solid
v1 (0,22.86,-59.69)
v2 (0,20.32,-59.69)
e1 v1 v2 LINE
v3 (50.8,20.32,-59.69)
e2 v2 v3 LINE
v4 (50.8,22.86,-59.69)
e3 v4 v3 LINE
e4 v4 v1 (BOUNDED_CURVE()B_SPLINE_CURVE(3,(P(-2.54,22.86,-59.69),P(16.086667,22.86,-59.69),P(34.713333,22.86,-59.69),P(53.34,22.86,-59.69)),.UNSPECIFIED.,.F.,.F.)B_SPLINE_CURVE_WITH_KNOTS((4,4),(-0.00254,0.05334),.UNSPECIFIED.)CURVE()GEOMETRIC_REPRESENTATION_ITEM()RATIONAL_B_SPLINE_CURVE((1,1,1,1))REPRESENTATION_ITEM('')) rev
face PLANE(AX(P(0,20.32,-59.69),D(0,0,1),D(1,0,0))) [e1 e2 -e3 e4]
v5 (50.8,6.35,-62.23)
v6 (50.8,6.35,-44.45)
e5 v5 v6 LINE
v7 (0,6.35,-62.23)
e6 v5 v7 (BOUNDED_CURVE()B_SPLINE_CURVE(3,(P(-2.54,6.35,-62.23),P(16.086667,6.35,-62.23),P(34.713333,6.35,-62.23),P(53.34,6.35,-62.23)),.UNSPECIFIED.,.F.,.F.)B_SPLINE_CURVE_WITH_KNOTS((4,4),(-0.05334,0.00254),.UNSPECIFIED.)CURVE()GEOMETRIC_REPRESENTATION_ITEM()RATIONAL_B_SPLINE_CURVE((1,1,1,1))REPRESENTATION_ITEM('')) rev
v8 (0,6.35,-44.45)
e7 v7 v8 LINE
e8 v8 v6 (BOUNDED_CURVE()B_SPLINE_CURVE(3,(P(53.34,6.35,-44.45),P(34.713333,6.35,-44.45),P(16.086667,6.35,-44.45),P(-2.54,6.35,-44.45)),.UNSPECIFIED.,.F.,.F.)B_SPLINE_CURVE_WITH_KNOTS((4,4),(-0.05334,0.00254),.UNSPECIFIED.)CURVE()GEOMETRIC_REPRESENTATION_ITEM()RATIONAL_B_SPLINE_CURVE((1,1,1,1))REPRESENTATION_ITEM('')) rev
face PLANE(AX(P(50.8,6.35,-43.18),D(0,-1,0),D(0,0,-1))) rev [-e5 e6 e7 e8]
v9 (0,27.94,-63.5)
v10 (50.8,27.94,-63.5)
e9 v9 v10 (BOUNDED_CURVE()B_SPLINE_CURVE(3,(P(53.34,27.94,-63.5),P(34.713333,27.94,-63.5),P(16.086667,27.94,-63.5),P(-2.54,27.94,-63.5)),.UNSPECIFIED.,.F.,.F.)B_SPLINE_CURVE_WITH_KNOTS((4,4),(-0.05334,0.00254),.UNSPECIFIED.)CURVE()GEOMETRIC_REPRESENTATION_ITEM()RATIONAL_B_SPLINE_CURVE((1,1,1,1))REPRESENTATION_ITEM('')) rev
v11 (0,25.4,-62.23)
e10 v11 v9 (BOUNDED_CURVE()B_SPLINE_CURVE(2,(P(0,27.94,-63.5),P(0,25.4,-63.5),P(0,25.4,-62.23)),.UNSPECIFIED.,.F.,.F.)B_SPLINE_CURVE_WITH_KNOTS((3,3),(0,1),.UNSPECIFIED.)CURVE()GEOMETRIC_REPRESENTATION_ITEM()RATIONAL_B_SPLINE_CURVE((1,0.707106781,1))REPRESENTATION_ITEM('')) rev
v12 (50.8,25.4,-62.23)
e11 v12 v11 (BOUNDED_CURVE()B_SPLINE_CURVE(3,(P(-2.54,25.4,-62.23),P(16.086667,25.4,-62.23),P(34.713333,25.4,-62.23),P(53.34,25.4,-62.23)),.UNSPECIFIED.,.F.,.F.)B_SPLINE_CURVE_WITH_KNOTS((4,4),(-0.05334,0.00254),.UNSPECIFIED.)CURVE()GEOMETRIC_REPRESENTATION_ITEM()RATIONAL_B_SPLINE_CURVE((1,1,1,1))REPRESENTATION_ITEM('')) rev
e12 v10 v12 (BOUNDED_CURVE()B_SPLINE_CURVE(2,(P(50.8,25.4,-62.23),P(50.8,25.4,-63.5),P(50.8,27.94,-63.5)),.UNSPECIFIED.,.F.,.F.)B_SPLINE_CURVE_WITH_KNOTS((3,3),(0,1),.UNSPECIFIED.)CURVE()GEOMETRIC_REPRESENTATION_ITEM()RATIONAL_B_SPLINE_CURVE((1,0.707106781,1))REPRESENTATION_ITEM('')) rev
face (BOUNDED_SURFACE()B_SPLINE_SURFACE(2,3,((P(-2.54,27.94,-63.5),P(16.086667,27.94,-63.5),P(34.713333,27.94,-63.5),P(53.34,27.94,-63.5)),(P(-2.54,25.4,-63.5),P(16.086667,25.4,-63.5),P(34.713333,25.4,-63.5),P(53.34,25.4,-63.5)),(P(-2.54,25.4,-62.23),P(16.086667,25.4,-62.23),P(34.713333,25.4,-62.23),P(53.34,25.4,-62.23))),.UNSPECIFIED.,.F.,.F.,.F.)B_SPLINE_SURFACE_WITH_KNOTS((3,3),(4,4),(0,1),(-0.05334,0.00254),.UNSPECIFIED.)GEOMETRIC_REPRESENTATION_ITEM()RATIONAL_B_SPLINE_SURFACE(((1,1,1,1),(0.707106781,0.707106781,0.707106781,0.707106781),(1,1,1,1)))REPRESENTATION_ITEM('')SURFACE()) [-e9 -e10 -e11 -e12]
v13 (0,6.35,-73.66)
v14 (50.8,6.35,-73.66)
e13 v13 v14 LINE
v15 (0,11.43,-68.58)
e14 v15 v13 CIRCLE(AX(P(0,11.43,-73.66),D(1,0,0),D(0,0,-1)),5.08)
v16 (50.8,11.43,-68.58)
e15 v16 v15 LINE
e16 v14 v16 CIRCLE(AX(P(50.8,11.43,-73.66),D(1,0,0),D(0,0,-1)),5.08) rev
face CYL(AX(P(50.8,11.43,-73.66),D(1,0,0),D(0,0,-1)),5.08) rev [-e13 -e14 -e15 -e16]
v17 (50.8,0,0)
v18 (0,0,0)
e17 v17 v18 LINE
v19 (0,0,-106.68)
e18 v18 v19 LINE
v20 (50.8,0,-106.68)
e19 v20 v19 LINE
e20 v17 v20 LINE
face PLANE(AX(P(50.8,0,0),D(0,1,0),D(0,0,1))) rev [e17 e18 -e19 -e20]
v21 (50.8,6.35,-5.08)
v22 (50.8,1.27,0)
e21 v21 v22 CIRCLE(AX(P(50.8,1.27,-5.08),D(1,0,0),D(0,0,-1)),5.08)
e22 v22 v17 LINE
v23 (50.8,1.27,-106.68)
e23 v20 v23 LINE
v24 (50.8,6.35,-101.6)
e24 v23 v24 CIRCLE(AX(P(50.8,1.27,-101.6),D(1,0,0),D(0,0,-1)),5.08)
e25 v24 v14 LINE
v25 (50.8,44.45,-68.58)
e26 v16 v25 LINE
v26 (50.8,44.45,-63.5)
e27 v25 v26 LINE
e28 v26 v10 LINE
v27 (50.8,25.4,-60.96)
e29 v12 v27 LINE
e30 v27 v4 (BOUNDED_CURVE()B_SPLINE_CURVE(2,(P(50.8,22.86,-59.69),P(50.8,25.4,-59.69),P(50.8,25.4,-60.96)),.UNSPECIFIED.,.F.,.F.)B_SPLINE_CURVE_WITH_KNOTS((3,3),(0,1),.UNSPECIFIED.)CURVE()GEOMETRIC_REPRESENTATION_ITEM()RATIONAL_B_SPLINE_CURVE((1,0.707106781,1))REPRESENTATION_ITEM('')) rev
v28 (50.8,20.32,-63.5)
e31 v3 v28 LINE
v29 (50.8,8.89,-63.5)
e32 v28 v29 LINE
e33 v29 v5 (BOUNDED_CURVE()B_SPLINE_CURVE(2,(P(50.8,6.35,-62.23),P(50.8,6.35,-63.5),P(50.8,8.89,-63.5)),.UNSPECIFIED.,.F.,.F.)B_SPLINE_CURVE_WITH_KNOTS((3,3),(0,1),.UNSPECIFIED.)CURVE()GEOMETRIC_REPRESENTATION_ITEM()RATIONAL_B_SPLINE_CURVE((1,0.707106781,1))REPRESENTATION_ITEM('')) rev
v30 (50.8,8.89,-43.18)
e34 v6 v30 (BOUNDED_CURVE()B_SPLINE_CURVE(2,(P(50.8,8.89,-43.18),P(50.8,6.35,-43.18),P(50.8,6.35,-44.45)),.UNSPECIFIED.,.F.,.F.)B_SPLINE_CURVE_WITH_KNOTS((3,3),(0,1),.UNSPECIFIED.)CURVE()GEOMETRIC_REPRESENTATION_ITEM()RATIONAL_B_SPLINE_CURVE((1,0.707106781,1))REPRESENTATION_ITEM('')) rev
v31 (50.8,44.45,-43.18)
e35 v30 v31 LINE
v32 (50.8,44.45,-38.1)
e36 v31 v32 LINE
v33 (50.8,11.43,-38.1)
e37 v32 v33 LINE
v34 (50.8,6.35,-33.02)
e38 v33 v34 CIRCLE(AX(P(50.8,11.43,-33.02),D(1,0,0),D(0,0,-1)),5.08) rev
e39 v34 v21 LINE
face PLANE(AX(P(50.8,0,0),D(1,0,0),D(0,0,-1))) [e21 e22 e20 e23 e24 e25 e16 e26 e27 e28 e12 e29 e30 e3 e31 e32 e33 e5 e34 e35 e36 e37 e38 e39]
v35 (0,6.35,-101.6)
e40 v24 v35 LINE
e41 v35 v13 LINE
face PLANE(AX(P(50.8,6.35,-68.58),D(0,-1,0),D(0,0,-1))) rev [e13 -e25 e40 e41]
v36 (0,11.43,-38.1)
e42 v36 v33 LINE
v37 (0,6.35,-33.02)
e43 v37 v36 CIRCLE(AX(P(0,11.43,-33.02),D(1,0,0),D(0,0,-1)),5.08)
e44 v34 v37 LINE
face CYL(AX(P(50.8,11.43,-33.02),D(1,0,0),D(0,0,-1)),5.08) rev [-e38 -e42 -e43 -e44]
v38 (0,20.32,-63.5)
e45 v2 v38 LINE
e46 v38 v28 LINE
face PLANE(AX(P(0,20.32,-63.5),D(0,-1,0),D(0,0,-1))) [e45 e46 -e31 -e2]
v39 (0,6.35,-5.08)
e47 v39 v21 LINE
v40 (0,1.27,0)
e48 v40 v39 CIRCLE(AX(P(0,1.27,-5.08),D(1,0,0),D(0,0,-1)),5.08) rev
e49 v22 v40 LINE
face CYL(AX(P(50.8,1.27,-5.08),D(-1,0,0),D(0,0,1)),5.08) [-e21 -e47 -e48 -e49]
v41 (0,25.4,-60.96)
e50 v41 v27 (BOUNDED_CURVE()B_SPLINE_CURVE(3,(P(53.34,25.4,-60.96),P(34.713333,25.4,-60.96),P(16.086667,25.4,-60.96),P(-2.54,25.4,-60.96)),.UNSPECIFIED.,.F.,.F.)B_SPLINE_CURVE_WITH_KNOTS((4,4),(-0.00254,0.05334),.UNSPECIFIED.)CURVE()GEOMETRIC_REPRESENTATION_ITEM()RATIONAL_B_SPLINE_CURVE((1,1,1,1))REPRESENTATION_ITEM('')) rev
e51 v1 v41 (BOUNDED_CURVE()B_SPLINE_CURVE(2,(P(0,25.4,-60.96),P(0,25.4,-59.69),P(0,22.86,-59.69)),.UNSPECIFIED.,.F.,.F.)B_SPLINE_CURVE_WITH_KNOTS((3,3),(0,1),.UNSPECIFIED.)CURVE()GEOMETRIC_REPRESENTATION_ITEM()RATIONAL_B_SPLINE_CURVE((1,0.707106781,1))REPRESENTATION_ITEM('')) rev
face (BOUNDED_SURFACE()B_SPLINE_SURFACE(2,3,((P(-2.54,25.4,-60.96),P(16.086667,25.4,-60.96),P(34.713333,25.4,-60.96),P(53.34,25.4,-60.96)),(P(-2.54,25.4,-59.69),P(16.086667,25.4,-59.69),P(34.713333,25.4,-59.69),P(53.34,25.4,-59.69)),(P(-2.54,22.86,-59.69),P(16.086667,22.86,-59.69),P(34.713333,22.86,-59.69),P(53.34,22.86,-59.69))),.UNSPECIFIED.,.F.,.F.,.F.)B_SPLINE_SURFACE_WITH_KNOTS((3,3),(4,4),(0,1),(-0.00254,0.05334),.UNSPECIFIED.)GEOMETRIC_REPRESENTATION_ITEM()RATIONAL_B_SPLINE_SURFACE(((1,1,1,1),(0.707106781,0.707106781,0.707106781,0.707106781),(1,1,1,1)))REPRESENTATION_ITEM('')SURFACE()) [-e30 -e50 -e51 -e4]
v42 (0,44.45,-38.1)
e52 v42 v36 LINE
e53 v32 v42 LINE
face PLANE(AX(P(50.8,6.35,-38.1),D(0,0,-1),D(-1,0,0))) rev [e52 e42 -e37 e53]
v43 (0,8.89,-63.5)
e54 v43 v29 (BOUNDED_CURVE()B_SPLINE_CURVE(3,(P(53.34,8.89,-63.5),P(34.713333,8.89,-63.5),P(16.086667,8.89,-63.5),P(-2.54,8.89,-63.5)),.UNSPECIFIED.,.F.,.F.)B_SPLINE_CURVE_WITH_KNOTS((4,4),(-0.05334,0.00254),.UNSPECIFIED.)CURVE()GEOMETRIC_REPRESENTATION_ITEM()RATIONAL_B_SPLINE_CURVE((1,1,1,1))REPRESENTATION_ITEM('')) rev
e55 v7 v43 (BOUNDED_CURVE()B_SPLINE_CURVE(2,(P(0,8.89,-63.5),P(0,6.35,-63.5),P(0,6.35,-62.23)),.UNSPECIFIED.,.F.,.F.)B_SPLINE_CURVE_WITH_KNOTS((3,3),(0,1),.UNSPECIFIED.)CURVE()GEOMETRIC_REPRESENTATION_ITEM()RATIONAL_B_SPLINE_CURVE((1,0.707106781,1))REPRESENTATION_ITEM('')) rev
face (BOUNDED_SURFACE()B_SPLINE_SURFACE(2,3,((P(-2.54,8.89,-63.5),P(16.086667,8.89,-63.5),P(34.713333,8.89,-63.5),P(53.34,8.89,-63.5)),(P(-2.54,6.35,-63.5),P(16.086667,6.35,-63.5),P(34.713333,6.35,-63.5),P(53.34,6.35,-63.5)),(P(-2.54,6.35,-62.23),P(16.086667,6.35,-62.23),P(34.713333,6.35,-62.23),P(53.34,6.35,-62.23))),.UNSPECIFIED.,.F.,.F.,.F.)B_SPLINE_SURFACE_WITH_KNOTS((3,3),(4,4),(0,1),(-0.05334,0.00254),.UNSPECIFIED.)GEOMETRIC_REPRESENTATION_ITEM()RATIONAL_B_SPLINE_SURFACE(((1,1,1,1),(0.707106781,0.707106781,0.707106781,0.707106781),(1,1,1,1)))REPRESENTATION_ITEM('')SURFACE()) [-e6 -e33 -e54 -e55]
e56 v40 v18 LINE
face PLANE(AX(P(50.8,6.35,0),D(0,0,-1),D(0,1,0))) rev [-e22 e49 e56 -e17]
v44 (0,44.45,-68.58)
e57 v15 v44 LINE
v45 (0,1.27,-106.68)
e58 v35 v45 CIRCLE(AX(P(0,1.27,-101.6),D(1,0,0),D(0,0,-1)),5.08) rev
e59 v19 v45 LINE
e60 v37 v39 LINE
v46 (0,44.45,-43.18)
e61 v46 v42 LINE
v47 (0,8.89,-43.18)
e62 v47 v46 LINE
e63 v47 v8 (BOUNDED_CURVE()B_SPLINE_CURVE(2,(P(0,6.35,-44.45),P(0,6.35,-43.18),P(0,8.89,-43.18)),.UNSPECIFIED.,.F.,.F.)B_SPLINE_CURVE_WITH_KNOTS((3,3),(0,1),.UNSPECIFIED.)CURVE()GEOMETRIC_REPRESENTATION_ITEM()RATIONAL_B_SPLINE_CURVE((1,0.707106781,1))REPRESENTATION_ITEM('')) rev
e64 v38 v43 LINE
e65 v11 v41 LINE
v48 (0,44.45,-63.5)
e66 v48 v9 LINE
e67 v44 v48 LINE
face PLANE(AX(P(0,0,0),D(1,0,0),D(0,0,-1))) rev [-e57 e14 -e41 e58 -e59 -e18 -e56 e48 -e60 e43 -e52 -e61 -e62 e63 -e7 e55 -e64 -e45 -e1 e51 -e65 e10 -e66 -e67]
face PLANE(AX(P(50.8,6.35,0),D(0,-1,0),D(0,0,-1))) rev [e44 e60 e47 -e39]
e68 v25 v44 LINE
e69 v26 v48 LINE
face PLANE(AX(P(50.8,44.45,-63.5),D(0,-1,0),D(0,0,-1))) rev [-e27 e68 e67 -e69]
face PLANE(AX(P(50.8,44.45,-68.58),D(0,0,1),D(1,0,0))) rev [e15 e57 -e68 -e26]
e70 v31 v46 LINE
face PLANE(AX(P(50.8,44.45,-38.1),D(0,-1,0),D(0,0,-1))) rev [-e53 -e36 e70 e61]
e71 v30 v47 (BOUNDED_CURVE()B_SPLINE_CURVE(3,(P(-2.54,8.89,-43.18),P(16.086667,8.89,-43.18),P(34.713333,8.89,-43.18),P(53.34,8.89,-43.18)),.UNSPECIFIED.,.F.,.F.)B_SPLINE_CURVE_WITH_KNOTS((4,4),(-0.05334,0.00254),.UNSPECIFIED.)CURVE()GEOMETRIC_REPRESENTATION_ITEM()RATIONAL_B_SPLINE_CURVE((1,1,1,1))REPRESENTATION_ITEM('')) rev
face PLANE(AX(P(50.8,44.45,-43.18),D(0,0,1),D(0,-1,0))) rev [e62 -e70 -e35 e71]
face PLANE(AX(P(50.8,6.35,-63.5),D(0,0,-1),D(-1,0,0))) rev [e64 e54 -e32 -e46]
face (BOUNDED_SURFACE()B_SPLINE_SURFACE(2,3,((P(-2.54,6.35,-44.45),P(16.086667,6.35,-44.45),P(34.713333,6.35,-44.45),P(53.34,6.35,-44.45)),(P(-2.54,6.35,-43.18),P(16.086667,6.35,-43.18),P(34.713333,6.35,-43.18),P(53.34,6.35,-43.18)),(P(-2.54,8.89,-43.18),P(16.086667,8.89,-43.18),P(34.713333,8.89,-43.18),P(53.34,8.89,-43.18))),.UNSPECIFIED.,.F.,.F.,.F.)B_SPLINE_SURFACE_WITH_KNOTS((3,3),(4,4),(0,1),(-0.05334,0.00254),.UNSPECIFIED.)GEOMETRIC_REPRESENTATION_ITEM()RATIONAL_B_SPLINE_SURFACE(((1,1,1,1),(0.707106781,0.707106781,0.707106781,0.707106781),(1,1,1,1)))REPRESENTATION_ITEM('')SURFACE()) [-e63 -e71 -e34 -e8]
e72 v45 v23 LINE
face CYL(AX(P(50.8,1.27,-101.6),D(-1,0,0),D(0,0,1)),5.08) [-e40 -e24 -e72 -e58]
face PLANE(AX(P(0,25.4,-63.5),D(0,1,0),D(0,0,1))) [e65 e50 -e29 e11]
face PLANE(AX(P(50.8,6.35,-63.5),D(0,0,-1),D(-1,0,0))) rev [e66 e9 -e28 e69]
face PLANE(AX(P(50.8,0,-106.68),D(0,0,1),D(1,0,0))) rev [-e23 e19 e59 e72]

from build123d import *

# Parameters (mm, degrees)
BOSS_EXTRUDE1_DEPTH = 50.8
SKETCH4_W           = 3.81
SKETCH4_H           = 5.08
BOSS_EXTRUDE5_DEPTH = 50.8
FILLET1_R           = 5.08
FILLET2_SIZE        = 1.27
FILLET2_SIZE_2      = 2.54


with BuildPart() as part:
    # Sketch1 → Boss-Extrude1 (new body)
    with BuildSketch(Plane(origin=(0, 0, 0), x_dir=(0, 0, -1), z_dir=(1, 0, 0))):
        Polygon((0, 0), (106.68, 0), (106.68, 6.35), (68.58, 6.35), (68.58, 44.45), (63.5, 44.45), (63.5, 6.35), (43.18, 6.35), (43.18, 44.45), (38.1, 44.45), (38.1, 6.35), (0, 6.35), align=None)
    extrude(amount=BOSS_EXTRUDE1_DEPTH)

    # Sketch4 → Boss-Extrude5 (add)
    with BuildSketch(Plane(origin=(50.8, 0, 0), x_dir=(0, 0, -1), z_dir=(1, 0, 0))):
        with Locations((61.595, 22.86)):
            Rectangle(SKETCH4_W, SKETCH4_H)
    extrude(amount=-BOSS_EXTRUDE5_DEPTH)

    # Fillet1
    fillet1_edges = [part.edges().sort_by_distance(p)[0] for p in [
        (25.4, 6.35, 0),
        (25.4, 6.35, -38.1),
        (25.4, 6.35, -68.58),
        (25.4, 6.35, -106.68),
    ]]
    fillet(fillet1_edges, radius=FILLET1_R)

    # Fillet2
    # an asymmetric fillet: 2.54, 1.27 mm, written as the material it adds along each edge
    with BuildSketch(Plane(origin=(0, 6.35, -63.5), x_dir=(0, 0, 1), z_dir=(1, 0, 0))) as fillet2_piece_1:
        with BuildLine():
            Bezier((FILLET2_SIZE, 0), (0, 0), (0, -FILLET2_SIZE_2), weights=[1, 0.707106781, 1])
            Line((0, -FILLET2_SIZE_2), (0, 0))
            Line((0, 0), (FILLET2_SIZE, 0))
        make_face()
    extrude(amount=50.8)
    with BuildSketch(Plane(origin=(0, 6.35, -43.18), x_dir=(0, 1, 0), z_dir=(1, 0, 0)), Plane(origin=(50.8, 25.4, -63.5), x_dir=(0, 1, 0), z_dir=(-1, 0, 0))) as fillet2_piece_2:
        with BuildLine():
            Bezier((FILLET2_SIZE_2, 0), (0, 0), (0, -FILLET2_SIZE), weights=[1, 0.707106781, 1])
            Line((0, -FILLET2_SIZE), (0, 0))
            Line((0, 0), (FILLET2_SIZE_2, 0))
        make_face()
    extrude(amount=50.8)
    # an asymmetric fillet: 2.54, 1.27 mm, written as the material it takes off along each edge
    with BuildSketch(Plane(origin=(57.15, 25.4, -59.69), x_dir=(0, 0, -1), z_dir=(-1, 0, 0))) as fillet2_2_piece_1:
        with BuildLine():
            Bezier((FILLET2_SIZE, 0), (0, 0), (0, FILLET2_SIZE_2), weights=[1, 0.707106781, 1])
            Line((0, FILLET2_SIZE_2), (0, 0))
            Line((0, 0), (FILLET2_SIZE, 0))
        make_face()
    extrude(amount=63.5, mode=Mode.SUBTRACT)


solid = part.part
